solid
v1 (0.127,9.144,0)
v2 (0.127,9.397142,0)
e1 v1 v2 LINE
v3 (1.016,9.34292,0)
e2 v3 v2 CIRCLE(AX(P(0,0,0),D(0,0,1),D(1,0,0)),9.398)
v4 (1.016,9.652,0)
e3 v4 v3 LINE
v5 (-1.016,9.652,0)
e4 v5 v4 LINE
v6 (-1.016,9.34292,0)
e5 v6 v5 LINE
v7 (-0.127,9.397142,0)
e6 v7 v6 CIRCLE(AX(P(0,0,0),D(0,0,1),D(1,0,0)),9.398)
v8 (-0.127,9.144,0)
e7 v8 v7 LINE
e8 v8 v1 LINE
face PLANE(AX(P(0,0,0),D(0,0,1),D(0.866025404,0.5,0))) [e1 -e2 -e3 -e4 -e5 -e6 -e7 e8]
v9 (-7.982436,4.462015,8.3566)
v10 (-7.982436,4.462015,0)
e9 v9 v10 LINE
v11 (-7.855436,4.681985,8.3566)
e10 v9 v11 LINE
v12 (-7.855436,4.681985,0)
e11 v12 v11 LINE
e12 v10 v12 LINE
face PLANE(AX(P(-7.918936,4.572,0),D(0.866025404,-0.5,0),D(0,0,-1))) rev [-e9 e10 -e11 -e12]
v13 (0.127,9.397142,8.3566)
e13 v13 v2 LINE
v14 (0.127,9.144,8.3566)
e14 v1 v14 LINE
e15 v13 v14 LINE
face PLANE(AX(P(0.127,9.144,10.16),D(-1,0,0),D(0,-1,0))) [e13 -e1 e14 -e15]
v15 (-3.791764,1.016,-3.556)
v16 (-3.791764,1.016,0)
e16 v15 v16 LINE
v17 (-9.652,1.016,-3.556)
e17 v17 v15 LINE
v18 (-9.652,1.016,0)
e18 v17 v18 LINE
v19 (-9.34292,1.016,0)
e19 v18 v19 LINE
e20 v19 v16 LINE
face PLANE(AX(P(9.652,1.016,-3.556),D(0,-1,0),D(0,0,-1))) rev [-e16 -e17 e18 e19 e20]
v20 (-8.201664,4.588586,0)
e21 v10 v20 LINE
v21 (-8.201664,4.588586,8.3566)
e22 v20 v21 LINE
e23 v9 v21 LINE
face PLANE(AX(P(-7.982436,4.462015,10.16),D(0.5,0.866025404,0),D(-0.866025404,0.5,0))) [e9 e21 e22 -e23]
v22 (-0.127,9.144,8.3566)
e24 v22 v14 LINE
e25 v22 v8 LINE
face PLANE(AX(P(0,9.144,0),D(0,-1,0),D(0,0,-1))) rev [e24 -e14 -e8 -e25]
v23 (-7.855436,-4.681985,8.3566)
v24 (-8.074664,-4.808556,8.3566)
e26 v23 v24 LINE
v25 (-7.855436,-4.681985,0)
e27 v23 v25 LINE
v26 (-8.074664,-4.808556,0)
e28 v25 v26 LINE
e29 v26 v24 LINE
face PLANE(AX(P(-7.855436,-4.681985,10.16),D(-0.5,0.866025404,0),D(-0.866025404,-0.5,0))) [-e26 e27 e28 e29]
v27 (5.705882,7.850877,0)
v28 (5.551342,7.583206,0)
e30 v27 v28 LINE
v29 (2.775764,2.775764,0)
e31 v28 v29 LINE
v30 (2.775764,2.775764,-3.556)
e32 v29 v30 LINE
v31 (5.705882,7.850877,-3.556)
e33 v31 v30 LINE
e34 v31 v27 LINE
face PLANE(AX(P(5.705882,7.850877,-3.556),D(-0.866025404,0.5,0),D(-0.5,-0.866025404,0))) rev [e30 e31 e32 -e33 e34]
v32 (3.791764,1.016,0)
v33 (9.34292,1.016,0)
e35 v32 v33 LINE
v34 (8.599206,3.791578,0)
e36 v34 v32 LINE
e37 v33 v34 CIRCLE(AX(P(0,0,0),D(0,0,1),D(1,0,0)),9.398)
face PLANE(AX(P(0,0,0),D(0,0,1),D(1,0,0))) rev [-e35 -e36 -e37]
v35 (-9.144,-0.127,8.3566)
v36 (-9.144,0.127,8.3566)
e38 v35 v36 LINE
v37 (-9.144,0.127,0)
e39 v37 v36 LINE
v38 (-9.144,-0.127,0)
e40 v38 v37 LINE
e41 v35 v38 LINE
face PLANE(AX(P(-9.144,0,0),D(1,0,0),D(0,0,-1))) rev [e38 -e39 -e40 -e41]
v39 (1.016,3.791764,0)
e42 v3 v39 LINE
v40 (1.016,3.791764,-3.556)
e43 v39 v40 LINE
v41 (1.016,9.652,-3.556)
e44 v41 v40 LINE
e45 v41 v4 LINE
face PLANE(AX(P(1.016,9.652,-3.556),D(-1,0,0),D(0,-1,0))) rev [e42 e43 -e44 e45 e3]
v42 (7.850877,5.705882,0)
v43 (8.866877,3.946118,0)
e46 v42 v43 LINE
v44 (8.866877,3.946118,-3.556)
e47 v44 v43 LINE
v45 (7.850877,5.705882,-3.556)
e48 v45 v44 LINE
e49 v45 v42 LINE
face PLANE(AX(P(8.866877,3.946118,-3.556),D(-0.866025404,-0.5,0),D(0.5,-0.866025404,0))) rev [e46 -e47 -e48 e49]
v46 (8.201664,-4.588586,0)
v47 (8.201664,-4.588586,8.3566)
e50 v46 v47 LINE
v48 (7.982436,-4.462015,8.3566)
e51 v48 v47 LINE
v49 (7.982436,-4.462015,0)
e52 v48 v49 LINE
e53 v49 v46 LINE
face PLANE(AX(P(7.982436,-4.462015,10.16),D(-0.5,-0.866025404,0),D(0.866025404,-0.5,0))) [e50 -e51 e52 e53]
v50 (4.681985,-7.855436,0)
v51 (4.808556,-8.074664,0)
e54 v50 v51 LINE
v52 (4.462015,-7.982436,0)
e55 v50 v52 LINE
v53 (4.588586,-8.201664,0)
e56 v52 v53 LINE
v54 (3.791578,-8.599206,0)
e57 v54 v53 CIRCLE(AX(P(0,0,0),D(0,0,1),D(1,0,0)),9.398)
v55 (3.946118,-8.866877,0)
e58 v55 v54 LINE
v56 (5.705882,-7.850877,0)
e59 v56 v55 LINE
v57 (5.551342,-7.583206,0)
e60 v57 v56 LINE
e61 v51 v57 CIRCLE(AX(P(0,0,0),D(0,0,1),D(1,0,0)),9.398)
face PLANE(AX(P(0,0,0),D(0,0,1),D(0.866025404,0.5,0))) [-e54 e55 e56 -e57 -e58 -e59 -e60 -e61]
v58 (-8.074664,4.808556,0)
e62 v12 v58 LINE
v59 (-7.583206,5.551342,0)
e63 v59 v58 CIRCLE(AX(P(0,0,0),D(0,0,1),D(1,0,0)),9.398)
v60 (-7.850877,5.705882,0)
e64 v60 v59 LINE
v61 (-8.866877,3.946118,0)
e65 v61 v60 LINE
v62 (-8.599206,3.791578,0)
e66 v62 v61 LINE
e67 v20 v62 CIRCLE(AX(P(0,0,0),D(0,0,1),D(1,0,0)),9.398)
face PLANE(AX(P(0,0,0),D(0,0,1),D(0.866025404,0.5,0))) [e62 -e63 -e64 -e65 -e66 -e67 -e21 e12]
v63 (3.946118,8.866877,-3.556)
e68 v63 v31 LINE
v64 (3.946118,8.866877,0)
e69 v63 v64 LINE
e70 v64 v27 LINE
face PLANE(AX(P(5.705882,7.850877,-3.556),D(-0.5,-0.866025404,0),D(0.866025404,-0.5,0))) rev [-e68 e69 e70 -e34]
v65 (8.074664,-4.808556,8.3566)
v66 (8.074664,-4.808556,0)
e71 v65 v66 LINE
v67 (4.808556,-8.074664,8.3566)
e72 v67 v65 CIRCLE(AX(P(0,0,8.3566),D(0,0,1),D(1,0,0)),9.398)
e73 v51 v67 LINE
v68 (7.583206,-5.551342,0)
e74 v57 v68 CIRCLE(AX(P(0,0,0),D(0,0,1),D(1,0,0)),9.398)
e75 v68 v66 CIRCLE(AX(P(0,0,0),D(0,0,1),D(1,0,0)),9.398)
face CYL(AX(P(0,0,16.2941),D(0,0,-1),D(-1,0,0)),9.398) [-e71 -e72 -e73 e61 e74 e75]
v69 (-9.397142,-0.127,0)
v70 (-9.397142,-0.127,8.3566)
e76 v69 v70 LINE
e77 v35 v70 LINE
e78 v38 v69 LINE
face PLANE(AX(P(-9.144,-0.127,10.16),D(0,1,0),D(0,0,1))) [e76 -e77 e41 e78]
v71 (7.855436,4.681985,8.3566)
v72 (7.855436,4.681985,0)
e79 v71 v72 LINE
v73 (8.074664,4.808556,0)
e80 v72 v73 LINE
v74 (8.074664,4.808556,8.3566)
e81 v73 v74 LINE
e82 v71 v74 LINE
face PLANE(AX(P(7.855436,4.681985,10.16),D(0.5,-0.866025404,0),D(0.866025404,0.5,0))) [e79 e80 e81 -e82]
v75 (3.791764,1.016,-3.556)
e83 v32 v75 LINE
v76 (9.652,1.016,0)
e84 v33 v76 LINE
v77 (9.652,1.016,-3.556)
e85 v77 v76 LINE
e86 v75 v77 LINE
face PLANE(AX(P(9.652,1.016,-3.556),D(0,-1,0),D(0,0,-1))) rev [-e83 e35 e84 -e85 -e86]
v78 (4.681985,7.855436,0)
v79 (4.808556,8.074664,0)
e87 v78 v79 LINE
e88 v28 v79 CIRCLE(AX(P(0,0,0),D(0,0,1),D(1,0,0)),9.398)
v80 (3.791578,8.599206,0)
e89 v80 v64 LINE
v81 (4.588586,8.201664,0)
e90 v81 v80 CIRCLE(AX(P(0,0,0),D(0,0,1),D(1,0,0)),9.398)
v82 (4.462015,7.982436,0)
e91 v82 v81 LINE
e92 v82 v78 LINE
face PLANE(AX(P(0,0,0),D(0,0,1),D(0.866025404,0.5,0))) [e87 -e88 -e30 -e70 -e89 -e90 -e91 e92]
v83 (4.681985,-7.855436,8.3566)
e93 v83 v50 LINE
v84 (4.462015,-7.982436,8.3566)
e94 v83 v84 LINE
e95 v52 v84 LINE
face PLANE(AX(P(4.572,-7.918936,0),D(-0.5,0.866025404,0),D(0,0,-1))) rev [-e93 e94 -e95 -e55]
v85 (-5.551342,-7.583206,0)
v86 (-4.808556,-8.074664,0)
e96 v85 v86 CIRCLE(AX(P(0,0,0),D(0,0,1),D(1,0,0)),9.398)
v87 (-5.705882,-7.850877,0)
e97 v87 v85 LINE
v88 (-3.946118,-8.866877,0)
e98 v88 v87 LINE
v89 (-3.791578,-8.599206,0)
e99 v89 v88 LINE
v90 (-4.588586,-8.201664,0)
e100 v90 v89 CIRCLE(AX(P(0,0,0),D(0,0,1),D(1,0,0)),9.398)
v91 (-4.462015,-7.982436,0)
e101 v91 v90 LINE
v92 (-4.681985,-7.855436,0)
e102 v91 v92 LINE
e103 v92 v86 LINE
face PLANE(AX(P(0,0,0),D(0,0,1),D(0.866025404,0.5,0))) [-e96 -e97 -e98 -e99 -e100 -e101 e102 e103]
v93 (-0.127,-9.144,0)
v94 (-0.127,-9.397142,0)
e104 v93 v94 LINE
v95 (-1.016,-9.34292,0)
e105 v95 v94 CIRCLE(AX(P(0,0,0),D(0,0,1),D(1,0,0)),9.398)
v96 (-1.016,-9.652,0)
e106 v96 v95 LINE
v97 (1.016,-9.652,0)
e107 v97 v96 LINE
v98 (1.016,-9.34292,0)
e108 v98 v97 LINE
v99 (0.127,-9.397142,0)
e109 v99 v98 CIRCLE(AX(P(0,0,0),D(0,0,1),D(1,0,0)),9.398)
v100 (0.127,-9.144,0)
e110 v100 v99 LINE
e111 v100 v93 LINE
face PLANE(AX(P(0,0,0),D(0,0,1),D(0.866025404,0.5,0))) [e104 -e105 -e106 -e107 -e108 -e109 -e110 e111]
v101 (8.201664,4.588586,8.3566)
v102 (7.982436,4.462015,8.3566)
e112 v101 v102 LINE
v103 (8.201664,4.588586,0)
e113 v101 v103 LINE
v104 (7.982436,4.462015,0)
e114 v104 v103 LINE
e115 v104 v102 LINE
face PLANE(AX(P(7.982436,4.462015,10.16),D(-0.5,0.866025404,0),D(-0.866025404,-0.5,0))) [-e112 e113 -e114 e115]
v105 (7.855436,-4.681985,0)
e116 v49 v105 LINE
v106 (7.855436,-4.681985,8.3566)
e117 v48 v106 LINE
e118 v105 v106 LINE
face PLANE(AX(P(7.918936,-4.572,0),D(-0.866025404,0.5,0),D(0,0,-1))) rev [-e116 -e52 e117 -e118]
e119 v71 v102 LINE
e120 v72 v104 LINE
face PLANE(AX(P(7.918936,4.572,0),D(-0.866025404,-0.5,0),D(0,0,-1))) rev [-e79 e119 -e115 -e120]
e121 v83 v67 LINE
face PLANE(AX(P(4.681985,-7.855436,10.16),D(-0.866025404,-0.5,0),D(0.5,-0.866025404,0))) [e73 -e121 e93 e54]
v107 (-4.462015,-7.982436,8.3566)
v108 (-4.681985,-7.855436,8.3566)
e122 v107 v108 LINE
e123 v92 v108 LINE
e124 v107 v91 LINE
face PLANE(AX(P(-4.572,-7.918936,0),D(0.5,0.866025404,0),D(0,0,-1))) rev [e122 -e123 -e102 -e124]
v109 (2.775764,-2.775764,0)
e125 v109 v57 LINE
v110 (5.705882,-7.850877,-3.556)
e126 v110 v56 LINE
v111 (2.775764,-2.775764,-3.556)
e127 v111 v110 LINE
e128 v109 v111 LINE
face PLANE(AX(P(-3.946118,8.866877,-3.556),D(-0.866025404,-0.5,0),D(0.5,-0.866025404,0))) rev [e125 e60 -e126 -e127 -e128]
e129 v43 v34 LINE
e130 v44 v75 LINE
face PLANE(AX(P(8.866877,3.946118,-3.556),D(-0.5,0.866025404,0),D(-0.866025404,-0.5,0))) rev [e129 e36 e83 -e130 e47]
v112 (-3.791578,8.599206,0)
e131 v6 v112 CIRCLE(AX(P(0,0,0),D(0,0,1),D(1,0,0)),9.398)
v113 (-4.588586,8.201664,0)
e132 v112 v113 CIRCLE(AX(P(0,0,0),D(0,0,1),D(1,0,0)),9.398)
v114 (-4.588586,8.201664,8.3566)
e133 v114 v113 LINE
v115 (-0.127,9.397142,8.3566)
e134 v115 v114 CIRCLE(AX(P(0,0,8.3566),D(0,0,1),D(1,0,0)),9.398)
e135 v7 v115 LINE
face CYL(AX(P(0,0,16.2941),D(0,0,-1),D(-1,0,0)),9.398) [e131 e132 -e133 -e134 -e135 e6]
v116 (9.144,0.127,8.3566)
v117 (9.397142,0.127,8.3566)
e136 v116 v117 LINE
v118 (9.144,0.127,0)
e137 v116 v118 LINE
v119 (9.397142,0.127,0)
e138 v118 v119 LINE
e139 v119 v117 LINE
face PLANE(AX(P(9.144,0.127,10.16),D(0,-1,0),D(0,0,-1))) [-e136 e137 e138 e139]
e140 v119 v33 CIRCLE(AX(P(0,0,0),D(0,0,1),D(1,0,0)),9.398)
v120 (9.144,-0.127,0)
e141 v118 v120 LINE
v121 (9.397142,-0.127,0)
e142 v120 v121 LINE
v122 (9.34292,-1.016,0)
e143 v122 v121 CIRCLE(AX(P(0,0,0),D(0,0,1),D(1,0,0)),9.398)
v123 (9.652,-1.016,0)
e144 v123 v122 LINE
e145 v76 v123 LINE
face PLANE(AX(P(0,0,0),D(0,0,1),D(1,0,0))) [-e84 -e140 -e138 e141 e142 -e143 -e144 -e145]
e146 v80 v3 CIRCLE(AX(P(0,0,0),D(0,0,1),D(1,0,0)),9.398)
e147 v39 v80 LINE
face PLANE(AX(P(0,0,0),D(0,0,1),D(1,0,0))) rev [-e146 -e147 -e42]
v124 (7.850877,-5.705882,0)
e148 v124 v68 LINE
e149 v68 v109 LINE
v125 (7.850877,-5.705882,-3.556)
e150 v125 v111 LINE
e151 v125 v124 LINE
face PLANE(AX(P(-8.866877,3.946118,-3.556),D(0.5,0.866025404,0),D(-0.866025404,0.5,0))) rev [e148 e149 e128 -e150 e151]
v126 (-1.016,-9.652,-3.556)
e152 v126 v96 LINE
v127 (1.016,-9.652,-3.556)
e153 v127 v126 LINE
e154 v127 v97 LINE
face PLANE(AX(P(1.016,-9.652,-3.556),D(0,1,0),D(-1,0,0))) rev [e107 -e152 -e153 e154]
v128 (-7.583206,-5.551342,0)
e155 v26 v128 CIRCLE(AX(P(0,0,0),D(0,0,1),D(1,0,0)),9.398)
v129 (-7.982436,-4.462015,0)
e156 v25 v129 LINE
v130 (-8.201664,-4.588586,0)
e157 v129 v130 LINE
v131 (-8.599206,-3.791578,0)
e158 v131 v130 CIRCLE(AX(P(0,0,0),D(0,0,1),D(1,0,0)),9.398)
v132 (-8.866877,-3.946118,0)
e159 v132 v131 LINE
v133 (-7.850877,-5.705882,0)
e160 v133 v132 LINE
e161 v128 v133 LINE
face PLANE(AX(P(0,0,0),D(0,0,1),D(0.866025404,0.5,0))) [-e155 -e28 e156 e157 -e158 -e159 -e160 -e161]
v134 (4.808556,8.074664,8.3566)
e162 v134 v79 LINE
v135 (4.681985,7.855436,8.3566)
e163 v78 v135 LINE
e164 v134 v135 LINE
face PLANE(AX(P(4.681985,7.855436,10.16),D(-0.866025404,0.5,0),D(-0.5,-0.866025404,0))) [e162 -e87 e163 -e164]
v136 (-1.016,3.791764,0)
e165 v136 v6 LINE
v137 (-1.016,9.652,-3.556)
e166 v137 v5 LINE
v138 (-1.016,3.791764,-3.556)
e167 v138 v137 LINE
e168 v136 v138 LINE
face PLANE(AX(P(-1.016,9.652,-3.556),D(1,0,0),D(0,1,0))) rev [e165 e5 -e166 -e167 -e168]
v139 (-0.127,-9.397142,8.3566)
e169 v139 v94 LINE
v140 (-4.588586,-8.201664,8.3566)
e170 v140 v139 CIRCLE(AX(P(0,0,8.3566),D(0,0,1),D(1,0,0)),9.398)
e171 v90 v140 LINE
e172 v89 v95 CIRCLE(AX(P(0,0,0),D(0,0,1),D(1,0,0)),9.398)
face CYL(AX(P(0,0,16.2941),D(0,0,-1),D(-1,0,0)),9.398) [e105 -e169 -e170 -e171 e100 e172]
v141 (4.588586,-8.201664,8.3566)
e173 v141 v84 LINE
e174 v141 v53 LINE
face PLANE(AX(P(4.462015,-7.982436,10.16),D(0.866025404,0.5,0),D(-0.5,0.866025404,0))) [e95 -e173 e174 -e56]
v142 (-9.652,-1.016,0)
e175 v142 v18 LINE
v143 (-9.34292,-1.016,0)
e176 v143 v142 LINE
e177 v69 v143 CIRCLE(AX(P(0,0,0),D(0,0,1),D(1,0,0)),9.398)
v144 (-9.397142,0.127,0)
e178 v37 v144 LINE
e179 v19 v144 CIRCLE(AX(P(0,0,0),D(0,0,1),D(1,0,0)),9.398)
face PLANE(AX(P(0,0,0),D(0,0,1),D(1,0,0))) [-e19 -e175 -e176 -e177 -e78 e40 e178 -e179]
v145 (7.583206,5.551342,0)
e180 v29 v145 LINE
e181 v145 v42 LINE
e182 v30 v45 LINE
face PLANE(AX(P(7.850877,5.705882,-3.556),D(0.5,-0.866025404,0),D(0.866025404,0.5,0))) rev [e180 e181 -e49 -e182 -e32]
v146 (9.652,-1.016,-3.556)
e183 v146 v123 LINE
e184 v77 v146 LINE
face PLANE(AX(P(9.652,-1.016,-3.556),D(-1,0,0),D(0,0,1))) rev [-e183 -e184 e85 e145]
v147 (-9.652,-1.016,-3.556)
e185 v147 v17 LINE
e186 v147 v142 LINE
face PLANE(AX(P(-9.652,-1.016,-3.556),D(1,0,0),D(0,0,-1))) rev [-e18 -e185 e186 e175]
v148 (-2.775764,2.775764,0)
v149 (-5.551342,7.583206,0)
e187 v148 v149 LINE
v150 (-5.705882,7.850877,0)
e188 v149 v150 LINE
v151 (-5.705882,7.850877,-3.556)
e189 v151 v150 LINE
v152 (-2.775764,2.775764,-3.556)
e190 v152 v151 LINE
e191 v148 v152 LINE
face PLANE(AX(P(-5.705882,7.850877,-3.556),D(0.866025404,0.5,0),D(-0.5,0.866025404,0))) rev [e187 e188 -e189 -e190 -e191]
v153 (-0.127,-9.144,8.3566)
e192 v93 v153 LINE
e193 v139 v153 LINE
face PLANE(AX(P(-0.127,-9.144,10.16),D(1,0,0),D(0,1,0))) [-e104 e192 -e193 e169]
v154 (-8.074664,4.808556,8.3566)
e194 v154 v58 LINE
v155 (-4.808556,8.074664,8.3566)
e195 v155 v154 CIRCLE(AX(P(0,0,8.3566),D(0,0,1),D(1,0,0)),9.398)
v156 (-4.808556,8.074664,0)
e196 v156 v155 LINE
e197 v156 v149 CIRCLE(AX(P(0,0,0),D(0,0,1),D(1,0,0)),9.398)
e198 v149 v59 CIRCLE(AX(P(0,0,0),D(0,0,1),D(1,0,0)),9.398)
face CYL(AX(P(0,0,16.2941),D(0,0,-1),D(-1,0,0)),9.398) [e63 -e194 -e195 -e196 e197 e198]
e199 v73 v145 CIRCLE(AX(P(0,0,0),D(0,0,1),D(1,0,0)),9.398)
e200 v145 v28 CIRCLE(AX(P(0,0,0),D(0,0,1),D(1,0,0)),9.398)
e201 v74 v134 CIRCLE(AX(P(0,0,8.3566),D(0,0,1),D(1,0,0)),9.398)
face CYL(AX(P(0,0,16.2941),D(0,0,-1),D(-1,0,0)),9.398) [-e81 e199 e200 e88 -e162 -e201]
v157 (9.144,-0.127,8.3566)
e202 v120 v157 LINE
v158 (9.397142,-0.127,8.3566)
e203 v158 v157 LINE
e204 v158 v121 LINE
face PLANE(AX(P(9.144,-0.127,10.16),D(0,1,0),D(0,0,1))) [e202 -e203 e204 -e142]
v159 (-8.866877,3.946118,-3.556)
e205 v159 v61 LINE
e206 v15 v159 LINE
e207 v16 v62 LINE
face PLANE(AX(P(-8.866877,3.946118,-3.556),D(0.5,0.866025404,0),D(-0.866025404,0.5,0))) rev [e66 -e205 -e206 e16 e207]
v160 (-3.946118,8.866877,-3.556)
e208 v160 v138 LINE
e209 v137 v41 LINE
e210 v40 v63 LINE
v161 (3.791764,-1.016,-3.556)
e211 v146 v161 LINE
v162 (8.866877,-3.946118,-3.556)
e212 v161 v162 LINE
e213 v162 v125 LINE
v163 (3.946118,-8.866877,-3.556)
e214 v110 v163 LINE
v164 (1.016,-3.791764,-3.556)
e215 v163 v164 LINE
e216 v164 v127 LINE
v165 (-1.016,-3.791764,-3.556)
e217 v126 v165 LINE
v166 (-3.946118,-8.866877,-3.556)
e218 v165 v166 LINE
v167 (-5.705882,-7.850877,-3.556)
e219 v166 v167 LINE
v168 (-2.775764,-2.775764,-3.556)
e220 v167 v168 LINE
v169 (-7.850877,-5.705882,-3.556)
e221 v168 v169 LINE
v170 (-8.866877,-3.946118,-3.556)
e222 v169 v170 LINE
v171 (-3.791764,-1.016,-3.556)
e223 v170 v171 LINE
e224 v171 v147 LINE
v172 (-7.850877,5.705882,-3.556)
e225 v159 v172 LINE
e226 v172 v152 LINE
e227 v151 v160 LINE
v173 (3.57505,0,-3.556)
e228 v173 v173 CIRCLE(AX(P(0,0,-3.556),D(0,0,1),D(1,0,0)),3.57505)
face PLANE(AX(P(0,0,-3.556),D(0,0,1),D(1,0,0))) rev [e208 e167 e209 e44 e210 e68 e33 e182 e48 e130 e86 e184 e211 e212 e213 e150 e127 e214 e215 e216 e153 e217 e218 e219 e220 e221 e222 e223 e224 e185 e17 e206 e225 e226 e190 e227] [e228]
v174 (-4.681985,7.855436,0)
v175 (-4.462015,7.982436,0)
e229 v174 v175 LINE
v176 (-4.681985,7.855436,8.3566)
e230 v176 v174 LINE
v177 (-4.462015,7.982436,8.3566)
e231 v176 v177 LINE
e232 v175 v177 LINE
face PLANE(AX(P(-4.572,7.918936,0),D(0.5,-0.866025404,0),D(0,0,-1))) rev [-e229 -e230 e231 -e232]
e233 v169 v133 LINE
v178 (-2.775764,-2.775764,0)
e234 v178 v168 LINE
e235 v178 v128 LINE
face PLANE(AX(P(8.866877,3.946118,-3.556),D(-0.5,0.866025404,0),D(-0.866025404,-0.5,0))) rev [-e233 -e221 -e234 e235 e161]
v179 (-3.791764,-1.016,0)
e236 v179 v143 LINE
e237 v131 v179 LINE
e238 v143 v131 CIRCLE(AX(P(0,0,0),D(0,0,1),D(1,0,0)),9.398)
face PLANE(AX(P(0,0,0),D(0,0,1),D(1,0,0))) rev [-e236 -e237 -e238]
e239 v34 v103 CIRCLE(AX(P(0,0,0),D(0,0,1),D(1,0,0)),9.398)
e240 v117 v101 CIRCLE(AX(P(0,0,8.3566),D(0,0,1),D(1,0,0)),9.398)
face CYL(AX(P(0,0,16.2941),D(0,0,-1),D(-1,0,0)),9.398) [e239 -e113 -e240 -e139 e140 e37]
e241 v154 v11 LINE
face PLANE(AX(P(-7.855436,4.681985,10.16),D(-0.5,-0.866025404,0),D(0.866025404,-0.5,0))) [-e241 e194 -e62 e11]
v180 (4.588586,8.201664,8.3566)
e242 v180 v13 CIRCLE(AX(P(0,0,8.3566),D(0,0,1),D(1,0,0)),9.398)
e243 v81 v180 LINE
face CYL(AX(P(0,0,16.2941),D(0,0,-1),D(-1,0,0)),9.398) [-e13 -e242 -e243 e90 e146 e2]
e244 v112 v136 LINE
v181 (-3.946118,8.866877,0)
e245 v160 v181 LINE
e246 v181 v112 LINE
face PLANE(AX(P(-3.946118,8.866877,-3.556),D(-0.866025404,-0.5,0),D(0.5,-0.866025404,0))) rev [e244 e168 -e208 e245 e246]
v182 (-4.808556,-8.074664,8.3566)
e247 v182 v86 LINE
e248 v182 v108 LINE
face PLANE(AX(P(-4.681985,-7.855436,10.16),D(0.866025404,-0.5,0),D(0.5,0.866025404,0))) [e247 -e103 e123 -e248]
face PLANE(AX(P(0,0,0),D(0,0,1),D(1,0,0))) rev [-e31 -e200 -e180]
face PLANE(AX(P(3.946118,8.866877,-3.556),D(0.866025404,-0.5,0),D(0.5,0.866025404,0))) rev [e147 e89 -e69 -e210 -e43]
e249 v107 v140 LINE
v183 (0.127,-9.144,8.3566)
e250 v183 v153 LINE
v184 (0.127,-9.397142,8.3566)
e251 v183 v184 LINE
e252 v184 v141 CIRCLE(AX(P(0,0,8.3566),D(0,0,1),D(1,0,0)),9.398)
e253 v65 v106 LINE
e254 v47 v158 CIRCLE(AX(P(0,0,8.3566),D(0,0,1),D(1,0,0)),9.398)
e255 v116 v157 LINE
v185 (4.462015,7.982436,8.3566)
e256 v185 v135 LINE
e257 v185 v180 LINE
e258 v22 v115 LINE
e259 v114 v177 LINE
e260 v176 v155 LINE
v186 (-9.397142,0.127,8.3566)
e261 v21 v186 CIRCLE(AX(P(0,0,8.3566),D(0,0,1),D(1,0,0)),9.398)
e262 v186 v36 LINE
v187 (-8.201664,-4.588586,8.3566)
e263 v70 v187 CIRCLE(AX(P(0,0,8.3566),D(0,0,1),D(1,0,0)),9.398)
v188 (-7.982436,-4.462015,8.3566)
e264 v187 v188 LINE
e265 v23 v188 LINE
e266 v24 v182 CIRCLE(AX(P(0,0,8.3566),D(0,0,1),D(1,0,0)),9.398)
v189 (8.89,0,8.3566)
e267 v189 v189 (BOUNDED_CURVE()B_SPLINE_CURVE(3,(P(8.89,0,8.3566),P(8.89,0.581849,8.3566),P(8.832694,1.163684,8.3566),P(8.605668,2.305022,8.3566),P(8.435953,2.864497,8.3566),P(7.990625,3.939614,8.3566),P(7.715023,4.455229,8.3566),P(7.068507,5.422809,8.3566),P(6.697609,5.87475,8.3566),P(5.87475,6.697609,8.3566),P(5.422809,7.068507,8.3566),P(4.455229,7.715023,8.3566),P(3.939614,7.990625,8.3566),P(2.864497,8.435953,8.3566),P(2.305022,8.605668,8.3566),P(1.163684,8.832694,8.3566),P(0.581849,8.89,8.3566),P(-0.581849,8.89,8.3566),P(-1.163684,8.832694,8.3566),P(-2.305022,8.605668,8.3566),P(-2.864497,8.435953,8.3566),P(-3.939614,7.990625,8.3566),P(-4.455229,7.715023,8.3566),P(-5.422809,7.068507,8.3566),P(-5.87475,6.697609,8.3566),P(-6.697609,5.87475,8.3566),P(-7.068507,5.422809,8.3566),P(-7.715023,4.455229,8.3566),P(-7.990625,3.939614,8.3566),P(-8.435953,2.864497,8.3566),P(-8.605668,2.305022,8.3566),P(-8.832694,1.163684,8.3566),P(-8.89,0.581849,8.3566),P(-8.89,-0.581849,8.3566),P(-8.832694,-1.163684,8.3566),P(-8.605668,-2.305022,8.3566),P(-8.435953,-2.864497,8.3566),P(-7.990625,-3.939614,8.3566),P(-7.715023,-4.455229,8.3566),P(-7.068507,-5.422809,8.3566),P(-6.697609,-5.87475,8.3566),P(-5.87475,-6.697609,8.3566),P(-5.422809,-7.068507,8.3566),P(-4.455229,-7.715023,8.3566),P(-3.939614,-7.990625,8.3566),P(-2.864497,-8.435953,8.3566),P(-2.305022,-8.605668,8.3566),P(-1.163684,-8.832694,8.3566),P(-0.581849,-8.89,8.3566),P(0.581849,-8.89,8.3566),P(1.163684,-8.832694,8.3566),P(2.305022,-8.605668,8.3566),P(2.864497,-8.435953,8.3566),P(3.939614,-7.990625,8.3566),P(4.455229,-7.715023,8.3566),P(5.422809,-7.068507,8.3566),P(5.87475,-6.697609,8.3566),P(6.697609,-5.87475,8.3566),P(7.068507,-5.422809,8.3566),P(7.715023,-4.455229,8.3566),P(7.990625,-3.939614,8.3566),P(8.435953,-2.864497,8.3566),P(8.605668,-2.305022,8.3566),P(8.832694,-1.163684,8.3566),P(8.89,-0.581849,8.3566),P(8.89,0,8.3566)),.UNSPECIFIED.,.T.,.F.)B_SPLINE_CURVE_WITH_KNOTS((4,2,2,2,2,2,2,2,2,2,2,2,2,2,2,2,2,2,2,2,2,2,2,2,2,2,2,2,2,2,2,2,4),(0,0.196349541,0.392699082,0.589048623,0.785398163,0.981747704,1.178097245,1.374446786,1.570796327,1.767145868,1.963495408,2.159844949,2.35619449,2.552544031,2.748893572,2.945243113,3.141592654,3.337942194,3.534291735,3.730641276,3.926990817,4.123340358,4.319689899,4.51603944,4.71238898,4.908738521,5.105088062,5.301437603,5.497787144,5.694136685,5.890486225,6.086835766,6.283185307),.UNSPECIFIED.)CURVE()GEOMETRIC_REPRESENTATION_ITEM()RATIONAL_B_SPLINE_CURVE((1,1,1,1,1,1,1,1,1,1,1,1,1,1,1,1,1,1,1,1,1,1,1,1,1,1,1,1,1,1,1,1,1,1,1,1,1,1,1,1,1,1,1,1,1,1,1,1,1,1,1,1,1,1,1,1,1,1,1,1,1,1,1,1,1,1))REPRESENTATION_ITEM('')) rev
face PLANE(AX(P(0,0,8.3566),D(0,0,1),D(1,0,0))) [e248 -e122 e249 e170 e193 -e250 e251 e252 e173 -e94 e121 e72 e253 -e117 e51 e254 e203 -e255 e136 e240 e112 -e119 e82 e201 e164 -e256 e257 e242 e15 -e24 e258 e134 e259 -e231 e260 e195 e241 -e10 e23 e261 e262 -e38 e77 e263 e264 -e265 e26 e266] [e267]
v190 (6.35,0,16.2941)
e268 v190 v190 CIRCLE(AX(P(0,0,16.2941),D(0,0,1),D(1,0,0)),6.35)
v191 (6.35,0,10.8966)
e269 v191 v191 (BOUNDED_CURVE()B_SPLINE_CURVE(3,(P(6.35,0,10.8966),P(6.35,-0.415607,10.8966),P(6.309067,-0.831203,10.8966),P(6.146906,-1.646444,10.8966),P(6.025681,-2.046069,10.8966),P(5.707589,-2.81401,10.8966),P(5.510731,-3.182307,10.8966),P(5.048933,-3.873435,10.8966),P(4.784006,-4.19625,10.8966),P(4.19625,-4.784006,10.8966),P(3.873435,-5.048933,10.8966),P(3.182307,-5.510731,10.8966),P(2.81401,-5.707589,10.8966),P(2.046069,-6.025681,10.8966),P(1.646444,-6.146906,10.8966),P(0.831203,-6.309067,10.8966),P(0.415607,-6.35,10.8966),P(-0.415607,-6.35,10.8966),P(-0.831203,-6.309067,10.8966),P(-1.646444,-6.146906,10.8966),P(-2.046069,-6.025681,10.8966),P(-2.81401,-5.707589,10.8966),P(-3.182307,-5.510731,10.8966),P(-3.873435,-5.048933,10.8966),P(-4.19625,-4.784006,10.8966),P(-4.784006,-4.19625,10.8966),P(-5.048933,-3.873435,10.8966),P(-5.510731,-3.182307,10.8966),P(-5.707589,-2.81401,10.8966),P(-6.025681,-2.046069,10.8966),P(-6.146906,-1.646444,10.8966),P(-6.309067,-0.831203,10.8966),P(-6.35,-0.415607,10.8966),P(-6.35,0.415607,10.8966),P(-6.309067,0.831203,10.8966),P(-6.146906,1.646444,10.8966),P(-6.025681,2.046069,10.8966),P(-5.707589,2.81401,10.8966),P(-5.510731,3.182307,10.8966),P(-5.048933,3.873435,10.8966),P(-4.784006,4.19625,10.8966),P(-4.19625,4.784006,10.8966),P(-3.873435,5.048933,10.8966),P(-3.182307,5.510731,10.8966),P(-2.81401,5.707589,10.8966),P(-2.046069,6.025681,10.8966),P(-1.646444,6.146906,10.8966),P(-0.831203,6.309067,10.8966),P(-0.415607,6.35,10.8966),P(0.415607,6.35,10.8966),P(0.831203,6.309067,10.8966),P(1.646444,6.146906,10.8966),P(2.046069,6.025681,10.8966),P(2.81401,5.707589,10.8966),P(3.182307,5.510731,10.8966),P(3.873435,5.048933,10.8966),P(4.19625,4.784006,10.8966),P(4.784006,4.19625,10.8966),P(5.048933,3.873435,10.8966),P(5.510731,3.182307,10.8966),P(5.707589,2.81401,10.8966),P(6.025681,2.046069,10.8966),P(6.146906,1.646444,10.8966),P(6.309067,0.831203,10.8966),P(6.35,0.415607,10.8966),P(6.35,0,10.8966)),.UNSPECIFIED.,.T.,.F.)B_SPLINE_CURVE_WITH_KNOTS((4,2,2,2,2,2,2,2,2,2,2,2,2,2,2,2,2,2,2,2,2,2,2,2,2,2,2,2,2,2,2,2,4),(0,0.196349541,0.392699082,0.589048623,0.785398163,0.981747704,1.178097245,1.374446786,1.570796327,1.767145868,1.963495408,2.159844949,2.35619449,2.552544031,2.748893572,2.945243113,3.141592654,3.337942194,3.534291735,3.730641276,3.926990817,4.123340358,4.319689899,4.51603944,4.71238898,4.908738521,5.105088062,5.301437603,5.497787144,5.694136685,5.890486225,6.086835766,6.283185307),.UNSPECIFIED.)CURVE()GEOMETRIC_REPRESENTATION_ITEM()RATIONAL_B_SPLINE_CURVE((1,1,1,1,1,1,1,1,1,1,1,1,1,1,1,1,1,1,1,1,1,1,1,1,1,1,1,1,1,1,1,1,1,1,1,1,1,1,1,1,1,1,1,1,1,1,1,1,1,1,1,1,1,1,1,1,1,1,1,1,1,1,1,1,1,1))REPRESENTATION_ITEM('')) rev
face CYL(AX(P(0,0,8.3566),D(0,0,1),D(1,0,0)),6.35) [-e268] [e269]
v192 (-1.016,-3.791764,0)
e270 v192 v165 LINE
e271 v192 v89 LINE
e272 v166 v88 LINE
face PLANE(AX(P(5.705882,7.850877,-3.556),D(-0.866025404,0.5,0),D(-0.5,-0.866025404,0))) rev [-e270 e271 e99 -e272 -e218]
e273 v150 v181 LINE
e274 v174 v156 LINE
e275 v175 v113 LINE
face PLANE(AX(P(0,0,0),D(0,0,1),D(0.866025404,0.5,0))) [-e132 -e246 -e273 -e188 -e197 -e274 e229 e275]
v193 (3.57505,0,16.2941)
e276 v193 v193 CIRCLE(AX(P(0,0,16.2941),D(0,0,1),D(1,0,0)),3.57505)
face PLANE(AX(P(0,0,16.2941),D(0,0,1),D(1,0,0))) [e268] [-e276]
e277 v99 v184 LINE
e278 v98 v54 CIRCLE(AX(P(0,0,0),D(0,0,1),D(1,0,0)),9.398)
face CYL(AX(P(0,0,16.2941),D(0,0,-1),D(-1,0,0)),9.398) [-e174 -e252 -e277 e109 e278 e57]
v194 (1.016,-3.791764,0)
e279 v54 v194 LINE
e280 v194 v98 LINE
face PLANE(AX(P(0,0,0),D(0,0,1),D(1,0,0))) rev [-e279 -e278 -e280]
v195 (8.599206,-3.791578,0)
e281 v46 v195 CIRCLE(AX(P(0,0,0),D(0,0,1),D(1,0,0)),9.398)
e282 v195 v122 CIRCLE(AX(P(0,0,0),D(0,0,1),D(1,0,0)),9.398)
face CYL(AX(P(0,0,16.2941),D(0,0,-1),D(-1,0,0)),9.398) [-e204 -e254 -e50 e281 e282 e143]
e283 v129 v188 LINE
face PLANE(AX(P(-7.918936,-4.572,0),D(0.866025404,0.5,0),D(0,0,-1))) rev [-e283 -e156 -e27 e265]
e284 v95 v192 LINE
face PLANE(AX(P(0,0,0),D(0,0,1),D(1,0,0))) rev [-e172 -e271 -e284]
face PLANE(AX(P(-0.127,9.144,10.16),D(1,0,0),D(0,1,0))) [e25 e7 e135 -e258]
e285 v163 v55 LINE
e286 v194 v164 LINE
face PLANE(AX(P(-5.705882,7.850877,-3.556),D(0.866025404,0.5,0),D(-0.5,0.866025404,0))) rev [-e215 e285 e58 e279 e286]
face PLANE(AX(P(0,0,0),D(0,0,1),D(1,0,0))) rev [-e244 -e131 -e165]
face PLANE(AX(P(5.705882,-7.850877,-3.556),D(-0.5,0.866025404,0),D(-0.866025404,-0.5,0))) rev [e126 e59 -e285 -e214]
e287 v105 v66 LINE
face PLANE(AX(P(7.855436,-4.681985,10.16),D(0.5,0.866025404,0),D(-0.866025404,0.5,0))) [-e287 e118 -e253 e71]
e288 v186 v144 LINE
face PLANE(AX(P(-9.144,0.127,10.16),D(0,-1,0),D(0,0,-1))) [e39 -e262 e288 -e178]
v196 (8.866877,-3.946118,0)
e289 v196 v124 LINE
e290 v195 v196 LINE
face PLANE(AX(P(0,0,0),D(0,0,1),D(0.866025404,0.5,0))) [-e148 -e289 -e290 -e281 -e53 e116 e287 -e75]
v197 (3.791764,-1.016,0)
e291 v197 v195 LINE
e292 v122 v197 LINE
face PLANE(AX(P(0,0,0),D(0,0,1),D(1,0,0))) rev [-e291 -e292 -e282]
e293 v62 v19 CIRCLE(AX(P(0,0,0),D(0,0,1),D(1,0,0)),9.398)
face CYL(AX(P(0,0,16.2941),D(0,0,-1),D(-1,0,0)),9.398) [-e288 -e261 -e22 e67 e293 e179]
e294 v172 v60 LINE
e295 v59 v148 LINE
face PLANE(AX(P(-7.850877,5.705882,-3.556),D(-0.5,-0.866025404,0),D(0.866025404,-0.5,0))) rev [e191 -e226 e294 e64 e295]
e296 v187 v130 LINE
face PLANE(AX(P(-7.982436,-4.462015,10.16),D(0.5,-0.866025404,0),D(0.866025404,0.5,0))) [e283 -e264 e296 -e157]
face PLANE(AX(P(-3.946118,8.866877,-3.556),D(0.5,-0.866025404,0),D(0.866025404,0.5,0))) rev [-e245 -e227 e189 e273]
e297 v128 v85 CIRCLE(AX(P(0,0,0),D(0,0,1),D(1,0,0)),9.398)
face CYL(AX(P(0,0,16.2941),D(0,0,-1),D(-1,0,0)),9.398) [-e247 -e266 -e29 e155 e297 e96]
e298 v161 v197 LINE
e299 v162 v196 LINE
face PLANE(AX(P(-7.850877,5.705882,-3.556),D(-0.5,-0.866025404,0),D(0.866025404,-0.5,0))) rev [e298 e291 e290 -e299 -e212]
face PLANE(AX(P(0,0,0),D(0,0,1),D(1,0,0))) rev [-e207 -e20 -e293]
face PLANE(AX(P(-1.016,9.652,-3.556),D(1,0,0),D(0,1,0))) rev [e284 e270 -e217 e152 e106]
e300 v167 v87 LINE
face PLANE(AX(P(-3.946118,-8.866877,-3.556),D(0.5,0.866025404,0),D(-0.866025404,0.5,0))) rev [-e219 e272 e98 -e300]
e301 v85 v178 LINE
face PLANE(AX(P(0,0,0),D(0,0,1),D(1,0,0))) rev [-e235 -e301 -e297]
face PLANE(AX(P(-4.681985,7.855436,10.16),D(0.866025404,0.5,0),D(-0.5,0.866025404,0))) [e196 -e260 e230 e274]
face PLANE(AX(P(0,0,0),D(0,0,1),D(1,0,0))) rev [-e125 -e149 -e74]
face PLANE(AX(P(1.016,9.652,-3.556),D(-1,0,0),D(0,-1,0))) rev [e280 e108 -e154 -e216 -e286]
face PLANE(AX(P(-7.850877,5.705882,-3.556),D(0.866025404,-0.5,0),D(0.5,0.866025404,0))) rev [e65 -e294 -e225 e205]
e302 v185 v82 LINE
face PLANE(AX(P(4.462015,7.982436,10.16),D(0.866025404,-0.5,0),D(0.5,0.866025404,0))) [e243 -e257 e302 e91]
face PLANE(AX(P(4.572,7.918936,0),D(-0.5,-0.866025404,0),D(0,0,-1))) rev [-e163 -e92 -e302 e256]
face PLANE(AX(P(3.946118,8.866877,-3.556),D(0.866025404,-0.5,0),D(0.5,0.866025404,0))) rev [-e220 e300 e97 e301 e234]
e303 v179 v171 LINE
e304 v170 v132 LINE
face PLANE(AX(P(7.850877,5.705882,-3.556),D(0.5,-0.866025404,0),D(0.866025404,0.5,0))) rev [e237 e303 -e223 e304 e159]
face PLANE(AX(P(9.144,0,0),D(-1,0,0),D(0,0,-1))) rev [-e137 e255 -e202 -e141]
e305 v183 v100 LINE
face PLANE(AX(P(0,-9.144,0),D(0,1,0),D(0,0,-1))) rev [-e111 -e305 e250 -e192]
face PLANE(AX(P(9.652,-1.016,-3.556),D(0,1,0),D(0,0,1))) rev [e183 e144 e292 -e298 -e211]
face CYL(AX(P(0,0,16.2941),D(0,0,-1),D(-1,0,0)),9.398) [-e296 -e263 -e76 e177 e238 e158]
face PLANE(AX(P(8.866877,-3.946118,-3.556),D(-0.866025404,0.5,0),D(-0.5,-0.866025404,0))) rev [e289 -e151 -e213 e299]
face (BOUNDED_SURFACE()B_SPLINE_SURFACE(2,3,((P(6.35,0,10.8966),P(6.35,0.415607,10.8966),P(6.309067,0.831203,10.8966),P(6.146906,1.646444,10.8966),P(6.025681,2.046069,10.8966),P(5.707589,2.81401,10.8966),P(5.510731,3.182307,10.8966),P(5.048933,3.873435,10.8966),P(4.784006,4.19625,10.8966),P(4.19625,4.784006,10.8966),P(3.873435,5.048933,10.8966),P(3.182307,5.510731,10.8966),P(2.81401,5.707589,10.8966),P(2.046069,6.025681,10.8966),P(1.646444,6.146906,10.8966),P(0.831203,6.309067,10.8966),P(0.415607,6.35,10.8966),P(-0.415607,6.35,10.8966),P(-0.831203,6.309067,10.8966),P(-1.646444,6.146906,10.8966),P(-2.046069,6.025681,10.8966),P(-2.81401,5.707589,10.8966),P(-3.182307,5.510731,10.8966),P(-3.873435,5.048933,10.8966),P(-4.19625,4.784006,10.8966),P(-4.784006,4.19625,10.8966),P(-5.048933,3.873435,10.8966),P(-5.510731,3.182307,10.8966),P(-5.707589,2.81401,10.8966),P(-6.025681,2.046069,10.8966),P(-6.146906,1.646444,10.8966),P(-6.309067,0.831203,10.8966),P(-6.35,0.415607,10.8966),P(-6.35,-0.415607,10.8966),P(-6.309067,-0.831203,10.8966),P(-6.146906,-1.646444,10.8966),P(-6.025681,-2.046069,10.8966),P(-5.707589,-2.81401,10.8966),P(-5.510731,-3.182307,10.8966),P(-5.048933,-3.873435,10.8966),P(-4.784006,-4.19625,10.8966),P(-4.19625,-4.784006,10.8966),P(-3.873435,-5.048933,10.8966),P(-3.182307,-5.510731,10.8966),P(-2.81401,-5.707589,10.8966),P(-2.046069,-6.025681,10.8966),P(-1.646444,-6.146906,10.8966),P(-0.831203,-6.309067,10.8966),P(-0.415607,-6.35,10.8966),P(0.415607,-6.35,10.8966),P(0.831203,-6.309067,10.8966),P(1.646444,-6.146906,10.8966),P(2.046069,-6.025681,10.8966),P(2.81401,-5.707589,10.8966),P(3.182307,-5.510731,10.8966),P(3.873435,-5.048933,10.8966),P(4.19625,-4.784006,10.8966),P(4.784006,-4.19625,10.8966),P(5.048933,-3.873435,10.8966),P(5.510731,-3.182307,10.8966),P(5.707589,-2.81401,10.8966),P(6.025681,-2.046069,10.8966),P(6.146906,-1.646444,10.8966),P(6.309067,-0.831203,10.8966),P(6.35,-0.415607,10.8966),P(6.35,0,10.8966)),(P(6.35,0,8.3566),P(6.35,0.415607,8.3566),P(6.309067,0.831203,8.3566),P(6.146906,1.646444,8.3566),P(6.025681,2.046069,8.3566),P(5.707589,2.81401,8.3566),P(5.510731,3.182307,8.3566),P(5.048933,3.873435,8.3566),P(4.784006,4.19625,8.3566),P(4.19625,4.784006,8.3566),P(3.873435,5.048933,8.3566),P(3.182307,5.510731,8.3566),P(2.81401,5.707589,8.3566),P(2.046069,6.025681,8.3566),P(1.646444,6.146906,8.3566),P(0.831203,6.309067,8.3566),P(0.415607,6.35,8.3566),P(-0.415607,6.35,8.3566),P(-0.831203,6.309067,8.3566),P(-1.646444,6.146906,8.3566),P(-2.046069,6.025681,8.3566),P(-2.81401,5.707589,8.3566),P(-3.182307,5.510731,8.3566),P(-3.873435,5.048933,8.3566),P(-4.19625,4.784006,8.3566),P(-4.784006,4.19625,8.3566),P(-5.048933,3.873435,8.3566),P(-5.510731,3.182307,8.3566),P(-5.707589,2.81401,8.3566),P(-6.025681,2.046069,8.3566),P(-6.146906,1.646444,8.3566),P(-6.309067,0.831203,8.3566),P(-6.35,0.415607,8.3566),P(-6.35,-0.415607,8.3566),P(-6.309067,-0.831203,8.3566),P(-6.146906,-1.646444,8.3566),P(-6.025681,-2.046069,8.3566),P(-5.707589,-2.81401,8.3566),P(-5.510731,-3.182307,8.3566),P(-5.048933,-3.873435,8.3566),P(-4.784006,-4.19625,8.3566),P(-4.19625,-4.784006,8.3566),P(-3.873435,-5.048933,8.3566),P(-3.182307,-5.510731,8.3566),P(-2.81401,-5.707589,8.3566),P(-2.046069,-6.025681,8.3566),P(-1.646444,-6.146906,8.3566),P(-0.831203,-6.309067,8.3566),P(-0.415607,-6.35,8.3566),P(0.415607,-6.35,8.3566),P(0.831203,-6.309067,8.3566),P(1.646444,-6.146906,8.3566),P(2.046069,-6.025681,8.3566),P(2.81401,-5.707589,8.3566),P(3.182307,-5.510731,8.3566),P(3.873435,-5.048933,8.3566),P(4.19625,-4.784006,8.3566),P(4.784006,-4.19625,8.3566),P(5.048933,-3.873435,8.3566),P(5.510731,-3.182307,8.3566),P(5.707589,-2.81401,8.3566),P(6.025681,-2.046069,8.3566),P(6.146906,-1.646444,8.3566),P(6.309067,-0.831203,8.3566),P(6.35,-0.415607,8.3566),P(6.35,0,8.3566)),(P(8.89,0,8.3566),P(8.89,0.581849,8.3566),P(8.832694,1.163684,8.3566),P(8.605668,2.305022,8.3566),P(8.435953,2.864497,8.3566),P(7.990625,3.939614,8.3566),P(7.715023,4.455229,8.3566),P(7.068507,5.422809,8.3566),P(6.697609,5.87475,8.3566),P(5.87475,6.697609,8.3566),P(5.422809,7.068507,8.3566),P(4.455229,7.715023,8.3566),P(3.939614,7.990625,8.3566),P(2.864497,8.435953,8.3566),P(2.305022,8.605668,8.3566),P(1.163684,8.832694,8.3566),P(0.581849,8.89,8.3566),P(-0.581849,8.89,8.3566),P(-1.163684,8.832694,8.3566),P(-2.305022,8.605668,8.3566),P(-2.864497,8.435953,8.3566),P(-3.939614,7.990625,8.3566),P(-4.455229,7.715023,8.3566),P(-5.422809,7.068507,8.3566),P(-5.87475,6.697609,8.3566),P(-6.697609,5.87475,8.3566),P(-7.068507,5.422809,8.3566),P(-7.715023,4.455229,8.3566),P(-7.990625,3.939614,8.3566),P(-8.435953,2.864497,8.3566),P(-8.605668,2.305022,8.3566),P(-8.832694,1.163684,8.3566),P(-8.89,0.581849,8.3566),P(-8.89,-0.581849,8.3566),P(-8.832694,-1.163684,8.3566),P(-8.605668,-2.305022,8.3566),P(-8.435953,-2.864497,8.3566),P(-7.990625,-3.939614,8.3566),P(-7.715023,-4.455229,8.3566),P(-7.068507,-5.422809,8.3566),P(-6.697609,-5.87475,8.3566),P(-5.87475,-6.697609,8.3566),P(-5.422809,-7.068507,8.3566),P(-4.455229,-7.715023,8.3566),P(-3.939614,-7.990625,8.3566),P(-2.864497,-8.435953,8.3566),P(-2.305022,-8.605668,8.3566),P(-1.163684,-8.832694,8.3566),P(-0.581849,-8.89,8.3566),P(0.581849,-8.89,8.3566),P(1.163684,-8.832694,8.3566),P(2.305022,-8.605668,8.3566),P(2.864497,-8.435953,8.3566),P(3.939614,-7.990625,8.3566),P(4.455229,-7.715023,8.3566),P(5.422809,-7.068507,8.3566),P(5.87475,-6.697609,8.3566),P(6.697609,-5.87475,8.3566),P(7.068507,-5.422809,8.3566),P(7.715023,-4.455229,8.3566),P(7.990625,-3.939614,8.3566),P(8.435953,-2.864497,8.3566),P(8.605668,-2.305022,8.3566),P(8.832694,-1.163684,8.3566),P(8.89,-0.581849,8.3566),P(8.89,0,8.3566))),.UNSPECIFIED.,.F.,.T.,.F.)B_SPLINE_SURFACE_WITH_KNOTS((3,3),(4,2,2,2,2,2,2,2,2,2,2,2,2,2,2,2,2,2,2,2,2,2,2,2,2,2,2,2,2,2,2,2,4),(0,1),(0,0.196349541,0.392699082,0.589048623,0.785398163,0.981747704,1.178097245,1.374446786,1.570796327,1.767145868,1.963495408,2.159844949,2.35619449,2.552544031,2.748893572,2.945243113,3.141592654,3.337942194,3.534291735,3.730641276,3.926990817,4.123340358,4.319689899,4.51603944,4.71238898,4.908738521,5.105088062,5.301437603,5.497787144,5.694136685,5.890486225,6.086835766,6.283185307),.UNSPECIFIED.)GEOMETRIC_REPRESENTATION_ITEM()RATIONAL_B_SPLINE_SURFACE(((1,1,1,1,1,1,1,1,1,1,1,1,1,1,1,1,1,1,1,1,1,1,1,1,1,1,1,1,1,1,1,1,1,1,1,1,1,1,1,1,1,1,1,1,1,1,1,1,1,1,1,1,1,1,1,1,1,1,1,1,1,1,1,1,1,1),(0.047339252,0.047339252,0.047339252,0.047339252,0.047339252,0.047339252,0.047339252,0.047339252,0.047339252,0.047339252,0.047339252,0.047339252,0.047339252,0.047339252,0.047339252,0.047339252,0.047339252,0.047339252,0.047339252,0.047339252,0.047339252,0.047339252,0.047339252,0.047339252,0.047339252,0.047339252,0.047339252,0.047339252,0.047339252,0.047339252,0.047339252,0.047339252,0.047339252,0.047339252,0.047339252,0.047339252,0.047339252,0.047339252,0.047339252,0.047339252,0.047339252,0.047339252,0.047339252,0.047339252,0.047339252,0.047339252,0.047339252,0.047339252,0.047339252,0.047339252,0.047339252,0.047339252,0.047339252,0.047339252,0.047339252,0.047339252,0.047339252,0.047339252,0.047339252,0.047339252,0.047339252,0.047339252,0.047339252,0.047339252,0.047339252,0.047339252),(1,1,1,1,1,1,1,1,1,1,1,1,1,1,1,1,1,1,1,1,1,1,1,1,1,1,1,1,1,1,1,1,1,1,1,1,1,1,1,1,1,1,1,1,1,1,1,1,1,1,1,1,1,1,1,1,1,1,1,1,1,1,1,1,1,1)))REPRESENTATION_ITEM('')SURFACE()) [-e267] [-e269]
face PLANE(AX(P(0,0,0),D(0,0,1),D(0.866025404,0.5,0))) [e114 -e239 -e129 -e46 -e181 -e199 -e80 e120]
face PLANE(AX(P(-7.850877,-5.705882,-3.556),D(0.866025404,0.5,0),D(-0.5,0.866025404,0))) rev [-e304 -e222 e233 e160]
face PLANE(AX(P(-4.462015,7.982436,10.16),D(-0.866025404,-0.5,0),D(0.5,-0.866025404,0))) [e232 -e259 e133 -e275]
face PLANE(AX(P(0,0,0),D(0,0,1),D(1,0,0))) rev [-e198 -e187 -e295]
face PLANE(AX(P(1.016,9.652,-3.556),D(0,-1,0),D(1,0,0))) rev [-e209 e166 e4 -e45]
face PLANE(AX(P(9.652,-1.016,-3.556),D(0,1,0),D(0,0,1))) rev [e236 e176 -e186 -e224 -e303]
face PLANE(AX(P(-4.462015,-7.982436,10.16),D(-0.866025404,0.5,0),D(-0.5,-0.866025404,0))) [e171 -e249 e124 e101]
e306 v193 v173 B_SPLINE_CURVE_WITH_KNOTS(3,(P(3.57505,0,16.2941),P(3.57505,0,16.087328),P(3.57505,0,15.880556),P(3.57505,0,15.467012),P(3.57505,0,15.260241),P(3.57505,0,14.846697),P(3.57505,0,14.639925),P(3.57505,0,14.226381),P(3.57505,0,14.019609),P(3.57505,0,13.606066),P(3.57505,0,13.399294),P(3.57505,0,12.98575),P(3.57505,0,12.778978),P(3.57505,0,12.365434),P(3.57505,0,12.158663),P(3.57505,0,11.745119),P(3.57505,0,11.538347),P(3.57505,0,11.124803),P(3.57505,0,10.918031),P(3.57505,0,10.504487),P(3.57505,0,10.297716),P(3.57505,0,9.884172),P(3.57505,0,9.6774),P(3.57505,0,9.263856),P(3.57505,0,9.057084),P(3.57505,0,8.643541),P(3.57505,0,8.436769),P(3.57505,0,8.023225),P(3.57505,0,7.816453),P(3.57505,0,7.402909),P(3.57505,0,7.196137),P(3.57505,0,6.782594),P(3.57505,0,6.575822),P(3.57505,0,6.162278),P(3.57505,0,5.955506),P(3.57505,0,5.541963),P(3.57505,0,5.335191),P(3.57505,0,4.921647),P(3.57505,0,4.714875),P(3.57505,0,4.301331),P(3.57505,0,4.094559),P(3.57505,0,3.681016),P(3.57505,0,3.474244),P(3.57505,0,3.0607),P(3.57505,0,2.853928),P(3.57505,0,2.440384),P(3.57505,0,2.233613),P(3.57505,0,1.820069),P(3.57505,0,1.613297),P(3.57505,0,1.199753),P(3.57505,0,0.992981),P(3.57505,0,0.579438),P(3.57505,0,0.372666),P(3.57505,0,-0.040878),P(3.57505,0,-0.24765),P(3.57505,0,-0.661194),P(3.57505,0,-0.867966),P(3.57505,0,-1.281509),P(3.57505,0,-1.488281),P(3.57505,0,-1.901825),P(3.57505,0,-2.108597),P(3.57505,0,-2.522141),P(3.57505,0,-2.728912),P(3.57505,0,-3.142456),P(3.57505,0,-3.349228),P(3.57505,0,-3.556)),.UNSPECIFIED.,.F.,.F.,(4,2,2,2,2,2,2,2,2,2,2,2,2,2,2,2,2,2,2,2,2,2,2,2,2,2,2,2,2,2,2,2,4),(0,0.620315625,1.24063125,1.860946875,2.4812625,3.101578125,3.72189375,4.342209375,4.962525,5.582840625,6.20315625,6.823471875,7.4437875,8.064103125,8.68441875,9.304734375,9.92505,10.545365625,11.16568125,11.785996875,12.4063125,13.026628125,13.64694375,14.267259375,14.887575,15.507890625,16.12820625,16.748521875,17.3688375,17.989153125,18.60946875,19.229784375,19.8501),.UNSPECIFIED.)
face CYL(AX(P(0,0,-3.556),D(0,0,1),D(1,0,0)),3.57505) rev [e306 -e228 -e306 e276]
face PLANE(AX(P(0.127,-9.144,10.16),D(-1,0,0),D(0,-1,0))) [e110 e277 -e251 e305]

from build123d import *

# Parameters (mm, degrees)
SKETCH1_R               = 9.398
BOSS_EXTRUDE1_DEPTH     = 16.2941
SKETCH2_OUTSIDE_W       = 27.032
SKETCH2_OUTSIDE_H       = 27.032
SKETCH2_OUTSIDE_R       = 6.35
CUT_EXTRUDE1_DEPTH      = 7.9375
FILLET1_SIZE            = 2.54
SKETCH3_W               = 19.304
SKETCH3_H               = 2.032
BOSS_EXTRUDE2_DEPTH     = 3.556
CIRPATTERN1_COUNT       = 12
CUT_EXTRUDE2_START      = -9.398
SKETCH5_W               = 10.16
SKETCH5_H               = 0.254
CUT_EXTRUDE2_DEPTH      = 0.254
CIRPATTERN2_COUNT       = 12
CUT_EXTRUDE3_DEPTH      = 25.090427103
CUT_EXTRUDE3_DEPTH_BACK = 25.090427103
SKETCH6_R               = 3.57505


with BuildPart() as part:
    # Sketch1 → Boss-Extrude1 (new body)
    with BuildSketch(Plane.XY):
        Circle(SKETCH1_R)
    extrude(amount=BOSS_EXTRUDE1_DEPTH)

    # Sketch2 outside → Cut-Extrude1 (cut)
    with BuildSketch(Plane.XY.offset(16.2941)):
        Rectangle(SKETCH2_OUTSIDE_W, SKETCH2_OUTSIDE_H)
        Circle(SKETCH2_OUTSIDE_R, mode=Mode.SUBTRACT)
    extrude(amount=-CUT_EXTRUDE1_DEPTH, mode=Mode.SUBTRACT)

    # Fillet1
    # a fillet whose section is not a circle: 2.54 mm, written as the material it adds along each edge
    with BuildSketch(Plane(origin=(0, 0, 8.3566), x_dir=(1, 0, 0), z_dir=(0, -1, 0))) as fillet1_piece_1:
        with BuildLine():
            Bezier((6.35 + FILLET1_SIZE, 0), (6.35, 0), (6.35, FILLET1_SIZE), weights=[1, 0.047339252, 1])
            Line((6.35, FILLET1_SIZE), (6.35, 0))
            Line((6.35, 0), (6.35 + FILLET1_SIZE, 0))
        make_face()
    revolve(axis=Axis((0, 0, 8.3566), (0, 0, 1)))

    # Sketch3 → Boss-Extrude2 (add)
    with BuildSketch(Plane(origin=(0, 0, 0), x_dir=(-1, 0, 0), z_dir=(0, 0, -1))):
        Rectangle(SKETCH3_W, SKETCH3_H)
    boss_extrude2 = extrude(amount=BOSS_EXTRUDE2_DEPTH)

    # CirPattern1: Boss-Extrude2 ×12 about axis
    cirpattern1_axis = Axis((0, 0, 0), (0, 0, 1))
    for i in range(1, CIRPATTERN1_COUNT):
        add(boss_extrude2.rotate(cirpattern1_axis, i * 360 / CIRPATTERN1_COUNT))

    # Sketch5 → Cut-Extrude2 (cut)
    with BuildSketch(Plane(origin=(0, 0, 0), x_dir=(0, 0, -1), z_dir=(1, 0, 0)).offset(CUT_EXTRUDE2_START)):
        with Locations((-5.08, 0)):
            Rectangle(SKETCH5_W, SKETCH5_H)
    cut_extrude2 = extrude(amount=CUT_EXTRUDE2_DEPTH, mode=Mode.SUBTRACT)

    # CirPattern2: Cut-Extrude2 ×12 about axis
    cirpattern2_axis = Axis((0, 0, 0), (0, 0, 1))
    for i in range(1, CIRPATTERN2_COUNT):
        add(cut_extrude2.rotate(cirpattern2_axis, i * 360 / CIRPATTERN2_COUNT), mode=Mode.SUBTRACT)

    # Sketch6 → Cut-Extrude3 (cut, two sides: drawn at the far end of the back side and taken through both)
    with BuildSketch(Plane.XY.offset(16.2941).offset(-CUT_EXTRUDE3_DEPTH_BACK)):
        Circle(SKETCH6_R)
    extrude(amount=CUT_EXTRUDE3_DEPTH + CUT_EXTRUDE3_DEPTH_BACK, mode=Mode.SUBTRACT)


solid = part.part
